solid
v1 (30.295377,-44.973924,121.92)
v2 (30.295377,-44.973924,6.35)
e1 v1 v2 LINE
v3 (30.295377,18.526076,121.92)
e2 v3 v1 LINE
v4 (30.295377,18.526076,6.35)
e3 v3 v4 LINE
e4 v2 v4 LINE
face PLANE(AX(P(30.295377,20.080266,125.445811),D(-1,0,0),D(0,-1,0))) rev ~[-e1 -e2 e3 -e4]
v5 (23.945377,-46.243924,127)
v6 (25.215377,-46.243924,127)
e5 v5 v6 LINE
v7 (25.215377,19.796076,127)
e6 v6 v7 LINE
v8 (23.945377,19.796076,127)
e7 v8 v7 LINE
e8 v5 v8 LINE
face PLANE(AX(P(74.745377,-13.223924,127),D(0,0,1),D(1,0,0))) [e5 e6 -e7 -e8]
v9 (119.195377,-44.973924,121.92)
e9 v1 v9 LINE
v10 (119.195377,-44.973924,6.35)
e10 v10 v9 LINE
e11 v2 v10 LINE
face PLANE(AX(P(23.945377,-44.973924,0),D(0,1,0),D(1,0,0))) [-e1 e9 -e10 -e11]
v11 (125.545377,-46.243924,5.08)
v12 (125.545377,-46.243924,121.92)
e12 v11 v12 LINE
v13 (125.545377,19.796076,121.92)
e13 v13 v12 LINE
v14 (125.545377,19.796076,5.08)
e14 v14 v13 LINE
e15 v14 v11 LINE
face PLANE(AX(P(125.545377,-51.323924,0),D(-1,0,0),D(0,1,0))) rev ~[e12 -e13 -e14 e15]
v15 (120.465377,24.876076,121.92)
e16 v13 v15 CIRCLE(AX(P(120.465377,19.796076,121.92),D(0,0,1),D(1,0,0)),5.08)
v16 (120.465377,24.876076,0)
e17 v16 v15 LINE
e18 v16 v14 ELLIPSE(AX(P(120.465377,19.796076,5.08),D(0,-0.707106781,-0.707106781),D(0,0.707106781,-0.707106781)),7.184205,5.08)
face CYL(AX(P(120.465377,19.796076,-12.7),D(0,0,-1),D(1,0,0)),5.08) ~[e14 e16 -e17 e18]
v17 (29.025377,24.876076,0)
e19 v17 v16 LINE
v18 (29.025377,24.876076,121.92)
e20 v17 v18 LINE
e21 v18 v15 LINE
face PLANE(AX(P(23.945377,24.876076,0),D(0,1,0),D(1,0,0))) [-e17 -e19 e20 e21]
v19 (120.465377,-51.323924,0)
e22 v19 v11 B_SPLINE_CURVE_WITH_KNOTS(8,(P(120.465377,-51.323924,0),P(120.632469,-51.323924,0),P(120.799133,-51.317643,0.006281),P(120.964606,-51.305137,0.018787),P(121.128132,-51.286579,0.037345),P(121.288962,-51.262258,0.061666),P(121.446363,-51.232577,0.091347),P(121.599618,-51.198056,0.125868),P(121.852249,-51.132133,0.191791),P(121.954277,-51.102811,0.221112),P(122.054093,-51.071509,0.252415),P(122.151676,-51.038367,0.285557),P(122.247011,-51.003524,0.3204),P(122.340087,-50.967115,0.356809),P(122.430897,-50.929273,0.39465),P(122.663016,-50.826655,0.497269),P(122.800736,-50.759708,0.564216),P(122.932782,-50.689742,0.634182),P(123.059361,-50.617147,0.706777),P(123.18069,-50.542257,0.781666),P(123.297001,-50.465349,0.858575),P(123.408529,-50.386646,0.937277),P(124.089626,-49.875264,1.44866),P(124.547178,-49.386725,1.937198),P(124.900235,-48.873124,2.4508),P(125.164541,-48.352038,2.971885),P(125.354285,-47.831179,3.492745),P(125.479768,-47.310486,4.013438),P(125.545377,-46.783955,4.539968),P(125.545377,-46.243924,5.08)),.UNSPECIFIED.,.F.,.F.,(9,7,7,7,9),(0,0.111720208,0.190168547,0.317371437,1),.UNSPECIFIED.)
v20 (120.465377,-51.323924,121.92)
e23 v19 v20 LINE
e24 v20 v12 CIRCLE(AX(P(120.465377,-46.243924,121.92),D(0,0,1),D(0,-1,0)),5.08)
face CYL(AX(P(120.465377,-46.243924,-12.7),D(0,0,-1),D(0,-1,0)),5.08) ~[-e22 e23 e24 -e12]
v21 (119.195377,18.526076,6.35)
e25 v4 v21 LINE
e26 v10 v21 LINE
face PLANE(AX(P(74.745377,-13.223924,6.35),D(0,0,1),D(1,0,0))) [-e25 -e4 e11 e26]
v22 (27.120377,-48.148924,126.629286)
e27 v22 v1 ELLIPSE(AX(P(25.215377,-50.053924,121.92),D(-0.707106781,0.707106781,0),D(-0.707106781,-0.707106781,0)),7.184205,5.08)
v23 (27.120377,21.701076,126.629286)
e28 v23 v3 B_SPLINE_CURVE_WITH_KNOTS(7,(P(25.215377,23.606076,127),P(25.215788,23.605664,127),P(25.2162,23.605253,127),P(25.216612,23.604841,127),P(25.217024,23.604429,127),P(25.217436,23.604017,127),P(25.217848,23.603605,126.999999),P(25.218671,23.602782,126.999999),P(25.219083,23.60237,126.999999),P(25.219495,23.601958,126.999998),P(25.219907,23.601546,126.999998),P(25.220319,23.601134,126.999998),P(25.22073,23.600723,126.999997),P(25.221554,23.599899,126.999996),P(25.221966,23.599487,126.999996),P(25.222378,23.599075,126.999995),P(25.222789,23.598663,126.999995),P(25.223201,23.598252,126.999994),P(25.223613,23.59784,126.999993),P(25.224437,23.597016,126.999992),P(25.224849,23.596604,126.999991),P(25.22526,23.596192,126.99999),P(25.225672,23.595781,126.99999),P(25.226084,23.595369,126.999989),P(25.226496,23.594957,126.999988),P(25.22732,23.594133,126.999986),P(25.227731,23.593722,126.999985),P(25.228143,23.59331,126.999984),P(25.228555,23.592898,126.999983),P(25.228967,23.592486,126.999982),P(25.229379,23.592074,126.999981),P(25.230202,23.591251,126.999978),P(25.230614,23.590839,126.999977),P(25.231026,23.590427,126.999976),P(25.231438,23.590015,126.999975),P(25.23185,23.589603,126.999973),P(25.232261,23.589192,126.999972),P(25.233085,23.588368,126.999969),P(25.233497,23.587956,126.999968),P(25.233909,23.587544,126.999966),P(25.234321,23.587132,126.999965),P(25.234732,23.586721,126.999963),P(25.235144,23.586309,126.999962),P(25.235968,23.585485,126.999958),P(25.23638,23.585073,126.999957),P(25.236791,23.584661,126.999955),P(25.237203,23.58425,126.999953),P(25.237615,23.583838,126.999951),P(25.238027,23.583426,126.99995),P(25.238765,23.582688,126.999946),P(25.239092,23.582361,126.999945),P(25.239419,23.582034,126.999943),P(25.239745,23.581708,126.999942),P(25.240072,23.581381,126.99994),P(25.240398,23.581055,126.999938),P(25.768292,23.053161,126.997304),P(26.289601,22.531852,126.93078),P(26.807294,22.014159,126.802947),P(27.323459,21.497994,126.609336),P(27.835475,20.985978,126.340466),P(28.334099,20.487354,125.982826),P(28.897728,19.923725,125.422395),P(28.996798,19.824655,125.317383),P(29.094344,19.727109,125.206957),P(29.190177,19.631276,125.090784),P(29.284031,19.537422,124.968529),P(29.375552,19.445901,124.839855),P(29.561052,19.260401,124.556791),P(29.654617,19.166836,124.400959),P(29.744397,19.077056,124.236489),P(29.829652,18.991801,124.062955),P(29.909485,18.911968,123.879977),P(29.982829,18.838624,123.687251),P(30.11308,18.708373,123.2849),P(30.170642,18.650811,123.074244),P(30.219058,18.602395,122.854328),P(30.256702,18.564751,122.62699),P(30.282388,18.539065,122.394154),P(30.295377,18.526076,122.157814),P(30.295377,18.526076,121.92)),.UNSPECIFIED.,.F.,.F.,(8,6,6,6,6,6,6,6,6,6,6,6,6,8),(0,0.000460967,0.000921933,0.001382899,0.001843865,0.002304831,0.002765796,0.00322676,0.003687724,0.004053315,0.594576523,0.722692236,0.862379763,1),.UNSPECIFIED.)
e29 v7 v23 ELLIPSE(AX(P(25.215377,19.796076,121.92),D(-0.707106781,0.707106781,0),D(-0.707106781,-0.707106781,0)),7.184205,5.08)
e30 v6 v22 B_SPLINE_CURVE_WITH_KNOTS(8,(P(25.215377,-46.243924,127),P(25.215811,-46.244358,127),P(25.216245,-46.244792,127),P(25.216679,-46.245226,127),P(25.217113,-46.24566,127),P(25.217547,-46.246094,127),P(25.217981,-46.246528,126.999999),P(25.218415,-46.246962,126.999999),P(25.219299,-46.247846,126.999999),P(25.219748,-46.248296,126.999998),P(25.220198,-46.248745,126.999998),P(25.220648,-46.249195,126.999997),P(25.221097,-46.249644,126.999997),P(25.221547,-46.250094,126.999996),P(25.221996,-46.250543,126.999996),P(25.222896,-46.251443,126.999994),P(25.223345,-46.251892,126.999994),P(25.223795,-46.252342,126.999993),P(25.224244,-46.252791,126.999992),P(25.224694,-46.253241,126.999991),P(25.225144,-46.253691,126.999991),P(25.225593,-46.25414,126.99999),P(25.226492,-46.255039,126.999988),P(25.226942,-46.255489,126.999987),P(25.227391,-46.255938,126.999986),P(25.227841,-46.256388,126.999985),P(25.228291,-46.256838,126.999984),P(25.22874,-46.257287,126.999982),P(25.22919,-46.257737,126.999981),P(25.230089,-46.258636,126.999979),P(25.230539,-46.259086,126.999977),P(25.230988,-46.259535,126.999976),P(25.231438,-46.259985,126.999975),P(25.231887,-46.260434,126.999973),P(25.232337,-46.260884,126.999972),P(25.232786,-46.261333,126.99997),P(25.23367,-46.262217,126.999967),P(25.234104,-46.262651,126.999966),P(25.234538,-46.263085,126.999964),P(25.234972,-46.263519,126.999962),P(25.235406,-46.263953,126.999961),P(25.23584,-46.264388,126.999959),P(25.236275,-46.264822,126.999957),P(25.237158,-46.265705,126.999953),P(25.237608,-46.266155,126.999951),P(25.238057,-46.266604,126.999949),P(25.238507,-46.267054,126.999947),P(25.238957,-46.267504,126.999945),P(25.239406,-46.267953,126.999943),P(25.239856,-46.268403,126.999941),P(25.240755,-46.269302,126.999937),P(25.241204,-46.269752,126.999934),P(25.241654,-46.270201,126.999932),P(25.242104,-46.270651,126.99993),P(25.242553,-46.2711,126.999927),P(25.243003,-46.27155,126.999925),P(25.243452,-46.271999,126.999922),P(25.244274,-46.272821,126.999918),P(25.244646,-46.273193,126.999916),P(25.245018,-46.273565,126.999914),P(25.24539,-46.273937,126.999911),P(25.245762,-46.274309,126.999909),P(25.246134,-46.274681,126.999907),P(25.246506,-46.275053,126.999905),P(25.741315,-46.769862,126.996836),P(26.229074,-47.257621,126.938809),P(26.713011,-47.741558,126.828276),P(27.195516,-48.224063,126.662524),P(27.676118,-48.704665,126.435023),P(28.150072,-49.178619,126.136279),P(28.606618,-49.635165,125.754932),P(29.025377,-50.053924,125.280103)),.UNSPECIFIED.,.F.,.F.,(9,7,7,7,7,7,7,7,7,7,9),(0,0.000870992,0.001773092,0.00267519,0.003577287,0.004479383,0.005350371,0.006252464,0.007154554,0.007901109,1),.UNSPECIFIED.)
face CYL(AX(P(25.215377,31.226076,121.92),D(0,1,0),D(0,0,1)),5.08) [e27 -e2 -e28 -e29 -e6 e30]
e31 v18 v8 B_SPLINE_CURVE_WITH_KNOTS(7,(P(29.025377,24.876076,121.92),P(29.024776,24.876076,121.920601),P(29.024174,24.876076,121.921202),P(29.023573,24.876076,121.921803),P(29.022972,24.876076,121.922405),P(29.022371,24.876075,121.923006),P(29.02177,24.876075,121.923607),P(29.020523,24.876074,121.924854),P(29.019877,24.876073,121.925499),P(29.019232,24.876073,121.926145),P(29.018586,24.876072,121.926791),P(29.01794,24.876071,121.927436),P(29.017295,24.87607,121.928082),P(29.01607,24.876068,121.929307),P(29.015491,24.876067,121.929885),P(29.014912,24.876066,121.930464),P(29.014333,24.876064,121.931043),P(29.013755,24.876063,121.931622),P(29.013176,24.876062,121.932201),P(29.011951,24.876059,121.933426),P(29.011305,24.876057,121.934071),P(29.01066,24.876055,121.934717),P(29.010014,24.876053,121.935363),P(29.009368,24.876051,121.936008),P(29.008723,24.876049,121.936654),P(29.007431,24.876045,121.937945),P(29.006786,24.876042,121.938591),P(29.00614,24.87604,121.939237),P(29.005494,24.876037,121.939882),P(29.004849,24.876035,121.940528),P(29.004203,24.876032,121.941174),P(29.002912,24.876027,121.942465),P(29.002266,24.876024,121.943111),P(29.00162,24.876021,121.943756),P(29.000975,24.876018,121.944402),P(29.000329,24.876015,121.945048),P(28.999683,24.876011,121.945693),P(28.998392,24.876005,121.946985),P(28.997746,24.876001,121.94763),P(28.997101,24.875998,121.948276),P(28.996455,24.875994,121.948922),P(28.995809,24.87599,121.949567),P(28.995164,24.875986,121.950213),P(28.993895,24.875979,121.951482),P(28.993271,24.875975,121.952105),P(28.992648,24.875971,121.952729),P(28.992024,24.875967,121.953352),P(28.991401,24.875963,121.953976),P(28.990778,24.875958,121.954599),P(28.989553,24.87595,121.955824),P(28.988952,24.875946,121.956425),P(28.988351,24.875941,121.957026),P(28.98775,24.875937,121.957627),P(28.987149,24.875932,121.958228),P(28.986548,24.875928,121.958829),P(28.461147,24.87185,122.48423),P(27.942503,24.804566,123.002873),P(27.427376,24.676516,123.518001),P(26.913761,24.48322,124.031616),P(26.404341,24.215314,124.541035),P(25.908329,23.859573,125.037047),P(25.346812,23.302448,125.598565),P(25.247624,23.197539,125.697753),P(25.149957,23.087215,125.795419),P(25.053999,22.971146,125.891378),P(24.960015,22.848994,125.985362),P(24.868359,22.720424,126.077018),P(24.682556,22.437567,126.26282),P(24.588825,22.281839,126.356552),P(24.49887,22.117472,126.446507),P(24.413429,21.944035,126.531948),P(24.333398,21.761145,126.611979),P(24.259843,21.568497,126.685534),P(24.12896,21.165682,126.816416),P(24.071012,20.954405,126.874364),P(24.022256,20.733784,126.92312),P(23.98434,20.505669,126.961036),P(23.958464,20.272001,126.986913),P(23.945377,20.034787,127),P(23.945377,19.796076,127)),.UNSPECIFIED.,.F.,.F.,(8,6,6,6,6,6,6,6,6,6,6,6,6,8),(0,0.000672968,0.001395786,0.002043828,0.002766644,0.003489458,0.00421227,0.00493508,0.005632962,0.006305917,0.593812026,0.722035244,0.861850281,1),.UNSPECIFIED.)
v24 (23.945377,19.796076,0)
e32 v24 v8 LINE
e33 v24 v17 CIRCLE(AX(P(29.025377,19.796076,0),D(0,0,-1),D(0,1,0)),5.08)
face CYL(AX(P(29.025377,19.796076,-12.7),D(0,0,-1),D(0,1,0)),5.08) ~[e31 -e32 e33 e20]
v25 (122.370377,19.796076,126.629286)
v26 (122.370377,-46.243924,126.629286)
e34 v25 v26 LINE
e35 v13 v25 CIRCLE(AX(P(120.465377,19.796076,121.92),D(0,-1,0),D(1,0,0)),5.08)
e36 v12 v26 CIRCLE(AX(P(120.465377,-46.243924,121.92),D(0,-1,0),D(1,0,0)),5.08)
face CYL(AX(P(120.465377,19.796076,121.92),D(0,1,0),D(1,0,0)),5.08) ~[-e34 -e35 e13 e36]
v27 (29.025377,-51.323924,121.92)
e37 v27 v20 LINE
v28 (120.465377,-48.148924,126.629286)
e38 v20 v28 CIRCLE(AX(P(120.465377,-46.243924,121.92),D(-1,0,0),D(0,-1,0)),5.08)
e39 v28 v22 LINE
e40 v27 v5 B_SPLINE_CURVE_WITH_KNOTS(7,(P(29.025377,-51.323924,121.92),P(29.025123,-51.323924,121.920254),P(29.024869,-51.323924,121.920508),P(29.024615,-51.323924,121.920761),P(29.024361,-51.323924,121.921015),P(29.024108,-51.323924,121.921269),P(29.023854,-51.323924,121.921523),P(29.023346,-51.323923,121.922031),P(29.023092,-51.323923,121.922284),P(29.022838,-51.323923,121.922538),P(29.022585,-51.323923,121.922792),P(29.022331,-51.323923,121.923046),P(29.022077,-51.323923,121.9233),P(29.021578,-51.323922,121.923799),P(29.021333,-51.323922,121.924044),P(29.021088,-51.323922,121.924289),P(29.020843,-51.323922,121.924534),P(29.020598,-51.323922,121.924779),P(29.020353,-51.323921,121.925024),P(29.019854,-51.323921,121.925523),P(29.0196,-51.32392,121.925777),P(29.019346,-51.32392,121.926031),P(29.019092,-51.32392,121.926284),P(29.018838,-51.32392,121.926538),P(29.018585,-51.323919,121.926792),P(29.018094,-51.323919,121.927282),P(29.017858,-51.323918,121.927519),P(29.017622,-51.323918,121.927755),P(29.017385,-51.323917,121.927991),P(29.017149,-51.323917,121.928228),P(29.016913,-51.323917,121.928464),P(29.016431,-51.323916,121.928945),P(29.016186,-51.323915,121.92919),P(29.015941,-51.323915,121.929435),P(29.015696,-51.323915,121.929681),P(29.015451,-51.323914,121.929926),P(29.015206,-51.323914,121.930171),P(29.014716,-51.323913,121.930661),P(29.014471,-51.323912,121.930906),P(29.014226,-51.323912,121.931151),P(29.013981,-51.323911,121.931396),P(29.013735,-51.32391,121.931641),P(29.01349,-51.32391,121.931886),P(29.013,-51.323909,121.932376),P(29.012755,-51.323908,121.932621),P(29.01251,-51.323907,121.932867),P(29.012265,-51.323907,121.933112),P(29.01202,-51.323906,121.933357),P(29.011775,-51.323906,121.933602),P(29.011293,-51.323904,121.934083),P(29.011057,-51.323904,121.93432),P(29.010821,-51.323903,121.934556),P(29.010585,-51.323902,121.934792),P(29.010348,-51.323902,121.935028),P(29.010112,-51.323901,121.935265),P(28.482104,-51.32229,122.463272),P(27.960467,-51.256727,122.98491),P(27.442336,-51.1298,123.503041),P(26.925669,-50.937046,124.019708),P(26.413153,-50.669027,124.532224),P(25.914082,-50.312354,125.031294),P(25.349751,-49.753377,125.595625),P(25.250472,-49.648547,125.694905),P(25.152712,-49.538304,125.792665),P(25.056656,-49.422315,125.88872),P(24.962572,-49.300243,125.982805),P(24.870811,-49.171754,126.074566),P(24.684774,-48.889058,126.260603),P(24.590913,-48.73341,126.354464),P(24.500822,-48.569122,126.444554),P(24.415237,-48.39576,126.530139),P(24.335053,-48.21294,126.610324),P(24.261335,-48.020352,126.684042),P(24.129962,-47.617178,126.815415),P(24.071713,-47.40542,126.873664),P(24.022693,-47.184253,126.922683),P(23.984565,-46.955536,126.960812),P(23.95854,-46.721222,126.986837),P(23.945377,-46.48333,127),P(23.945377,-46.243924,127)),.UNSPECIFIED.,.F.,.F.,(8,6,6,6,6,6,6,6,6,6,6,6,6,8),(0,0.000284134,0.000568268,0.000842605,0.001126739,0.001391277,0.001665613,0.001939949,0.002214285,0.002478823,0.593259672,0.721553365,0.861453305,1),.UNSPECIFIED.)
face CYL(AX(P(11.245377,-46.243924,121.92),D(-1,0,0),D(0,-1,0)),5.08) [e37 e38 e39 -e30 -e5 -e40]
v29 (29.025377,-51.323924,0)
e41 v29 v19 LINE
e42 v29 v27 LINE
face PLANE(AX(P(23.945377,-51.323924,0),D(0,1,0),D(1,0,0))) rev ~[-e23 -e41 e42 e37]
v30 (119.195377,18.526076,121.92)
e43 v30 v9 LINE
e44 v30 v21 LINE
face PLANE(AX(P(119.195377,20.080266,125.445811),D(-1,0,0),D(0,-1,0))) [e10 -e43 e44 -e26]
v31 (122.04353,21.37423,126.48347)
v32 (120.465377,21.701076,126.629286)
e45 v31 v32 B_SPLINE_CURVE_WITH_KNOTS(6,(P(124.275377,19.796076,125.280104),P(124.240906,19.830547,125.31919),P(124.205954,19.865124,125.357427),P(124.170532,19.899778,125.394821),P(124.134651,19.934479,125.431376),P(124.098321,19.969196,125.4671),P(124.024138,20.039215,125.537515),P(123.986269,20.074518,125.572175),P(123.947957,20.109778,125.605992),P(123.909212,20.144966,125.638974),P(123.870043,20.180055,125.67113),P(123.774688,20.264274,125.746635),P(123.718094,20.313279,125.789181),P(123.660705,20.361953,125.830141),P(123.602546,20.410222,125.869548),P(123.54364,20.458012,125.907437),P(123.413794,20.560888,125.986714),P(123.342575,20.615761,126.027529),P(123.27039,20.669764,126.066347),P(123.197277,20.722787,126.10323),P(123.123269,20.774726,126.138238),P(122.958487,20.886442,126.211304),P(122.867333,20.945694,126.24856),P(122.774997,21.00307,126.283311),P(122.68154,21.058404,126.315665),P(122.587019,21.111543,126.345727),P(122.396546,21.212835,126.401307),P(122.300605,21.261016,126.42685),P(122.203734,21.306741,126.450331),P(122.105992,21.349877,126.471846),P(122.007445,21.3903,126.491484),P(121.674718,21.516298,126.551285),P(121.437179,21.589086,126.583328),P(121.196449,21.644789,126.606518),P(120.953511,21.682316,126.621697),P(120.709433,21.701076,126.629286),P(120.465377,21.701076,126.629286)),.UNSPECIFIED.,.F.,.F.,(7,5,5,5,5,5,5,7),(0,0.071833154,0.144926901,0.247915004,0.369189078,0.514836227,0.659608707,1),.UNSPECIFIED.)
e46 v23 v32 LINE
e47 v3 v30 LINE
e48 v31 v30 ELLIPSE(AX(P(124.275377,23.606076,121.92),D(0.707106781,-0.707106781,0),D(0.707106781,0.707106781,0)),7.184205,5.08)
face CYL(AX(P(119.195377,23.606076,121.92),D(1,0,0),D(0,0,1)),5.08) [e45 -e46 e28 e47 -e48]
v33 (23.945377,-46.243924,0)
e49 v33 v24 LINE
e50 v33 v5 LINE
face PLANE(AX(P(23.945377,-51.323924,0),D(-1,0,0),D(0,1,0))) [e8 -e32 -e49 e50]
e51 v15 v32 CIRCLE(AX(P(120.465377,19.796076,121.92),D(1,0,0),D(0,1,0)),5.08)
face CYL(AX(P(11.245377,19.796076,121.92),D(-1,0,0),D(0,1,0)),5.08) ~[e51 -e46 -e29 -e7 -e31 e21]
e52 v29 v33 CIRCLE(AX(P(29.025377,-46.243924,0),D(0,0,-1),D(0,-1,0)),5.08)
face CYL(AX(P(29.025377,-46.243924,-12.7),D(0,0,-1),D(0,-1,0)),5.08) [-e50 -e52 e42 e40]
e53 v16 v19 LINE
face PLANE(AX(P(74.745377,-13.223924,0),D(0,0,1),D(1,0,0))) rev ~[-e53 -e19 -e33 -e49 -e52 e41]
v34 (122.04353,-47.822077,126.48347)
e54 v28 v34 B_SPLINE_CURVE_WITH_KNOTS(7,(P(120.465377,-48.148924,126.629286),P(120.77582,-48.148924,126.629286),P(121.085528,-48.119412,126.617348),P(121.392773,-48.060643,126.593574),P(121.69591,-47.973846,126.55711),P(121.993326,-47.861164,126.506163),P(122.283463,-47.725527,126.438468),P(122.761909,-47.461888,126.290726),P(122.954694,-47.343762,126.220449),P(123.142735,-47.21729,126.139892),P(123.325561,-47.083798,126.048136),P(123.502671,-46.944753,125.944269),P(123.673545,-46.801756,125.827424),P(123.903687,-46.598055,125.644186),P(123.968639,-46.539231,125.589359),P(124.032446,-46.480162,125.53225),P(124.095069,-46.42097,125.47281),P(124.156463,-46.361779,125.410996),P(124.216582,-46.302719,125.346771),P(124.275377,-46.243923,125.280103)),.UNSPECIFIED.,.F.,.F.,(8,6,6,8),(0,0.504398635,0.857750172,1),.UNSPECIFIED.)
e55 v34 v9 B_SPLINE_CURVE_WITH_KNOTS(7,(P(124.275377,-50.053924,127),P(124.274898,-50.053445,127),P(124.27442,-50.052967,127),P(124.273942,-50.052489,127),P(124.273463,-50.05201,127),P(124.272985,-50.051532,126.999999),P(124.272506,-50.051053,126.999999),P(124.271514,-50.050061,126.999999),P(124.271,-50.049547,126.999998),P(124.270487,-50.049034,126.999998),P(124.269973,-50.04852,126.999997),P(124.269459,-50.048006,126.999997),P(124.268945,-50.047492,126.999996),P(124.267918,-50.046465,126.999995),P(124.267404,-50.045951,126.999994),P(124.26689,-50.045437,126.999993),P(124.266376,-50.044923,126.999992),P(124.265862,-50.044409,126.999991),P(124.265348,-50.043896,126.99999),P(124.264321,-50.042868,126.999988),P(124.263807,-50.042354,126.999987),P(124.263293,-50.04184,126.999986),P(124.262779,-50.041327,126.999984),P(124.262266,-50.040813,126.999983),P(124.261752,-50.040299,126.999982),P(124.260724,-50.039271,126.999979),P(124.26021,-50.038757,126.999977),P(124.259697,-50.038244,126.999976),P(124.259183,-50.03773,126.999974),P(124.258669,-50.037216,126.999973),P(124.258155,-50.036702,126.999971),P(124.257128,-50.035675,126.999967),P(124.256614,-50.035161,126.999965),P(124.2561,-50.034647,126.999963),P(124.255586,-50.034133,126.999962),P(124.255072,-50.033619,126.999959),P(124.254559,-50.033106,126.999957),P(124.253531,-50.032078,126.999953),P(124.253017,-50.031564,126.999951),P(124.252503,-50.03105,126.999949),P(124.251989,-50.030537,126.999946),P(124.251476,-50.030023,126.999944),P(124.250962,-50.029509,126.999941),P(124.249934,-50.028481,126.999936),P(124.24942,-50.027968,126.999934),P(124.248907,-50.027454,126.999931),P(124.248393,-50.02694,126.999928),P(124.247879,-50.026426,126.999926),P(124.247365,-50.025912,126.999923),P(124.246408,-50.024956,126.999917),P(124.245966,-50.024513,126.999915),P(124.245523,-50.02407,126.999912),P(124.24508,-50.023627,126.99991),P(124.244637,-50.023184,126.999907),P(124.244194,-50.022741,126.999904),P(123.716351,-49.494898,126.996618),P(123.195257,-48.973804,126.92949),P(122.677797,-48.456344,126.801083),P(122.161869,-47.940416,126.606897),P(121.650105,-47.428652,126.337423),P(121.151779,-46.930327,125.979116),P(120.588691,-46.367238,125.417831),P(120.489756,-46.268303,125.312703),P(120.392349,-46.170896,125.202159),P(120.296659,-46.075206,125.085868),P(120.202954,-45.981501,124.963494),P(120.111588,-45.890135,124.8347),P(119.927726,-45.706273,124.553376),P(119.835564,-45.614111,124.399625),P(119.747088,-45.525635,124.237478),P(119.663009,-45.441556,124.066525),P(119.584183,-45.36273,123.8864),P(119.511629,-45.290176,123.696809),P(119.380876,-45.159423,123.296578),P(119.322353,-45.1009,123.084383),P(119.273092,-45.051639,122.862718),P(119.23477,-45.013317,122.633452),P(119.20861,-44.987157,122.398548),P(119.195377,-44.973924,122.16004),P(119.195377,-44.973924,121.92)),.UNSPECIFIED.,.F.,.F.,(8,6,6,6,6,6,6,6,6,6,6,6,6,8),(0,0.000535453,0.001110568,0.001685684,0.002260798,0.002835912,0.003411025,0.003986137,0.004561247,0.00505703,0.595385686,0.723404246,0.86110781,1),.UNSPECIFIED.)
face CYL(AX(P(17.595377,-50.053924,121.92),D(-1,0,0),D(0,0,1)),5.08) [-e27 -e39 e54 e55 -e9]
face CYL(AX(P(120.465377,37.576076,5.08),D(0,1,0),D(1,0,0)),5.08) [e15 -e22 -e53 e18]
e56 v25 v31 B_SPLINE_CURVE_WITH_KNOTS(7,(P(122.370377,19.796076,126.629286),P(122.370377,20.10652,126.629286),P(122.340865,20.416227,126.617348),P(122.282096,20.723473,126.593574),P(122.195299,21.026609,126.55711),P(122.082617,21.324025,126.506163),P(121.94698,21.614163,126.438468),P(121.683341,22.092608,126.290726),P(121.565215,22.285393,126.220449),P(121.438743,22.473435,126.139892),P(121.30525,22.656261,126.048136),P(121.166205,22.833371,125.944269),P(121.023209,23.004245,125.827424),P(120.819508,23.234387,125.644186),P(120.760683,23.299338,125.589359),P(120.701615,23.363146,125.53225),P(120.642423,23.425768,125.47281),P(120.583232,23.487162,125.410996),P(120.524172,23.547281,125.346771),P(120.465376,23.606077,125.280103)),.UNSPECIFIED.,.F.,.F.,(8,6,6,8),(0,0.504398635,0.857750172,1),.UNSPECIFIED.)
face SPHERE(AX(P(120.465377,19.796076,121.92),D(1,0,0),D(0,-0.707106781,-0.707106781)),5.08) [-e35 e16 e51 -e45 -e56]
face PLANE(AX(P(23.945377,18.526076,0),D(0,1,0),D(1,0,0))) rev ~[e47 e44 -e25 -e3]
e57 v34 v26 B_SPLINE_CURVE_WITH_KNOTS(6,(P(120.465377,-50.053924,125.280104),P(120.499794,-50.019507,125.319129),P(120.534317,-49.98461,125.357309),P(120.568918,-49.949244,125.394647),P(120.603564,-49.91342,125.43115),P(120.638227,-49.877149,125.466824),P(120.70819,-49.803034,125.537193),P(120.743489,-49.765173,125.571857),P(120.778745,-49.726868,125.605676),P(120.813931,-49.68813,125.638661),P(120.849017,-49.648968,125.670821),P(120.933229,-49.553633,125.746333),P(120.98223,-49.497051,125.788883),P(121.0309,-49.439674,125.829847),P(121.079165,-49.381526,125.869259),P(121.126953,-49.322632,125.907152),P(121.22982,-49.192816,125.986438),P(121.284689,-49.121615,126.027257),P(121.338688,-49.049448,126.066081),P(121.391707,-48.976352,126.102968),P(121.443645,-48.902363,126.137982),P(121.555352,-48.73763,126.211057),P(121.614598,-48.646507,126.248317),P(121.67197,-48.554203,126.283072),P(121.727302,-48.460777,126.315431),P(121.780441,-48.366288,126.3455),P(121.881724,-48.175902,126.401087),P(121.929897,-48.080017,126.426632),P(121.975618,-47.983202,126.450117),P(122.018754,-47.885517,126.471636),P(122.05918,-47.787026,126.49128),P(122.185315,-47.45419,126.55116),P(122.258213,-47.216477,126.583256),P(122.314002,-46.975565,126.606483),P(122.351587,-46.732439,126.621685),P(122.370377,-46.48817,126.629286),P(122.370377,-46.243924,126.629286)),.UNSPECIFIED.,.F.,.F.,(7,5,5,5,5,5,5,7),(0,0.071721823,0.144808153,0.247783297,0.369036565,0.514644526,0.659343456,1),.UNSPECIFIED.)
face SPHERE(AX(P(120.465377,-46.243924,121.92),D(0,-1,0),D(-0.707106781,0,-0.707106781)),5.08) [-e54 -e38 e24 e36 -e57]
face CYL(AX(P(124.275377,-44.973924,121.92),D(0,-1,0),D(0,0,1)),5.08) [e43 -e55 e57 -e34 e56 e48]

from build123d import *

# Parameters (mm, degrees)
F0_W         = 101.6
F0_H         = 76.2
F1_DEPTH     = 127
F2_T         = -6.35
F3_T1_DEPTH  = 152.4
F3_T3_DEPTH  = 134.62
F3_T5_DEPTH  = 101.6
F3_T7_DEPTH  = 66.04
F3_T9_DEPTH  = 109.22
F3_T11_DEPTH = 88.9
F3_T13_DEPTH = 63.5
F3_S17_W     = 5.1816
F3_S17_H     = 5.1816
F3_T18_DEPTH = 5.1816
F3_S23_W     = 5.1816
F3_S23_H     = 5.1816
F3_T24_DEPTH = 5.1816
F3_T31_DEPTH = 101.6
F3_T36_DEPTH = 76.2
F3_T44_DEPTH = 76.2
F3_T49_DEPTH = 101.6
F3_T57_DEPTH = 101.6
F3_T62_DEPTH = 76.2
F3_T70_DEPTH = 101.6
F3_T75_DEPTH = 76.2


# Not quite as in the source:
# - a fillet or chamfer that OpenCascade refuses, or shapes differently, is made with other operations: its cross-section is extruded or revolved along the edge and cut away or added


with BuildPart() as f1:
    # F0 (on Top) → F1 (new body)
    with BuildSketch(Plane.XY):
        with Locations((74.7453766656, -13.2239237391)):
            Rectangle(F0_W, F0_H)
    extrude(amount=F1_DEPTH)

    # F2
    f2_openings = [f1.faces().sort_by_distance(p)[0] for p in [
        (74.745377, -13.223924, 127),
    ]]
    offset(amount=F2_T, openings=f2_openings)

    # F3: fillet of radius 5.08 on 12 edges, made by hand

    # F3_s2 → F3_t1 (cut)
    with BuildSketch(Plane.XY.offset(-12.7)):
        with BuildLine():
            ThreePointArc((29.0253766656, 24.8760762609), (25.4332742171, 23.3881787093), (23.9453766656, 19.7960762609))
            Line((23.9453766656, 19.7960762609), (23.9453766656, 24.8760762609))
            Line((23.9453766656, 24.8760762609), (29.0253766656, 24.8760762609))
        make_face()
        with BuildLine():
            ThreePointArc((29.0253766656, -51.3239237391), (25.4332742171, -49.8360261876), (23.9453766656, -46.2439237391))
            Line((23.9453766656, -46.2439237391), (23.9453766656, -51.3239237391))
            Line((23.9453766656, -51.3239237391), (29.0253766656, -51.3239237391))
        make_face()
    extrude(amount=F3_T1_DEPTH, mode=Mode.SUBTRACT)

    # F3_s4 → F3_t3 (cut)
    with BuildSketch(Plane.XY.offset(-12.7)):
        with BuildLine():
            ThreePointArc((125.5453766656, 19.7960762609), (124.057479114, 23.3881787093), (120.4653766656, 24.8760762609))
            Line((120.4653766656, 24.8760762609), (125.5453766656, 24.8760762609))
            Line((125.5453766656, 24.8760762609), (125.5453766656, 19.7960762609))
        make_face()
        with BuildLine():
            ThreePointArc((120.4653766656, -51.3239237391), (124.057479114, -49.8360261876), (125.5453766656, -46.2439237391))
            Line((125.5453766656, -46.2439237391), (125.5453766656, -51.3239237391))
            Line((125.5453766656, -51.3239237391), (120.4653766656, -51.3239237391))
        make_face()
    extrude(amount=F3_T3_DEPTH, mode=Mode.SUBTRACT)

    # F3_s6 → F3_t5 (cut)
    with BuildSketch(Plane.XZ.offset(-37.5760762609)):
        with BuildLine():
            ThreePointArc((125.5453766656, 5.08), (124.057479114, 1.4878975516), (120.4653766656, 0))
            Line((120.4653766656, 0), (125.5453766656, 0))
            Line((125.5453766656, 0), (125.5453766656, 5.08))
        make_face()
    extrude(amount=F3_T5_DEPTH, mode=Mode.SUBTRACT)

    # F3_s8 → F3_t7 (cut)
    with BuildSketch(Plane.XZ.offset(-19.7960762609)):
        with BuildLine():
            ThreePointArc((125.5453766656, 121.92), (124.057479114, 125.5121024484), (120.4653766656, 127))
            Line((120.4653766656, 127), (125.5453766656, 127))
            Line((125.5453766656, 127), (125.5453766656, 121.92))
        make_face()
    extrude(amount=F3_T7_DEPTH, mode=Mode.SUBTRACT)

    # F3_s10 → F3_t9 (cut)
    with BuildSketch(Plane.YZ.offset(11.2453766656)):
        with BuildLine():
            ThreePointArc((-51.3239237391, 121.92), (-49.8360261876, 125.5121024484), (-46.2439237391, 127))
            Line((-46.2439237391, 127), (-51.3239237391, 127))
            Line((-51.3239237391, 127), (-51.3239237391, 121.92))
        make_face()
        with BuildLine():
            ThreePointArc((24.8760762609, 121.92), (23.3881787093, 125.5121024484), (19.7960762609, 127))
            Line((19.7960762609, 127), (24.8760762609, 127))
            Line((24.8760762609, 127), (24.8760762609, 121.92))
        make_face()
    extrude(amount=F3_T9_DEPTH, mode=Mode.SUBTRACT)

    # F3_s12 → F3_t11 (cut)
    with BuildSketch(Plane.YZ.offset(30.2953766656)):
        with BuildLine():
            ThreePointArc((23.6060762609, 127), (20.0139738124, 125.5121024484), (18.5260762609, 121.92))
            Line((18.5260762609, 121.92), (18.5260762609, 127))
            Line((18.5260762609, 127), (23.6060762609, 127))
        make_face()
        with BuildLine():
            ThreePointArc((-50.0539237391, 127), (-46.4618212907, 125.5121024484), (-44.9739237391, 121.92))
            Line((-44.9739237391, 121.92), (-44.9739237391, 127))
            Line((-44.9739237391, 127), (-50.0539237391, 127))
        make_face()
    extrude(amount=F3_T11_DEPTH, mode=Mode.SUBTRACT)

    # F3_s14 → F3_t13 (cut)
    with BuildSketch(Plane.XZ.offset(-18.5260762609)):
        with BuildLine():
            ThreePointArc((25.2153766656, 127), (28.807479114, 125.5121024484), (30.2953766656, 121.92))
            Line((30.2953766656, 121.92), (30.2953766656, 127))
            Line((30.2953766656, 127), (25.2153766656, 127))
        make_face()
        with BuildLine():
            ThreePointArc((124.2753766656, 127), (120.6832742171, 125.5121024484), (119.1953766656, 121.92))
            Line((119.1953766656, 121.92), (119.1953766656, 127))
            Line((119.1953766656, 127), (124.2753766656, 127))
        make_face()
    extrude(amount=F3_T13_DEPTH, mode=Mode.SUBTRACT)


with BuildPart() as f3_tool16:
    # F3_s17 → F3_t18 (new body)
    with BuildSketch(Plane.YZ.offset(120.4653766656)):
        with Locations((22.3868762609, 124.5108)):
            Rectangle(F3_S17_W, F3_S17_H)
    extrude(amount=F3_T18_DEPTH)

    # F3_s19 → F3_t20 (revolve, cut)
    with BuildSketch(Plane(origin=(120.4653766656, 19.7960762609, 121.92), x_dir=(0, -0.7071067812, -0.7071067812), z_dir=(0, -0.7071067812, 0.7071067812))):
        with BuildLine():
            ThreePointArc((0, -5.08), (5.08, 0), (0, 5.08))
            Line((0, 5.08), (0, -5.08))
        make_face()
    revolve(axis=Axis((120.4653766656, 19.7960762609, 121.92), (1, 0, 0)), mode=Mode.SUBTRACT)


with BuildPart() as f1_1:
    add(f1.part)

    # F3_t15: cut F3_tool16
    add(f3_tool16.part, mode=Mode.SUBTRACT)


with BuildPart() as f3_tool22:
    # F3_s23 → F3_t24 (new body)
    with BuildSketch(Plane.XZ.offset(46.2439237391)):
        with Locations((123.0561766656, 124.5108)):
            Rectangle(F3_S23_W, F3_S23_H)
    extrude(amount=F3_T24_DEPTH)

    # F3_s25 → F3_t26 (revolve, cut)
    with BuildSketch(Plane(origin=(120.4653766656, -46.2439237391, 121.92), x_dir=(-0.7071067812, 0, -0.7071067812), z_dir=(-0.7071067812, 0, 0.7071067812))):
        with BuildLine():
            ThreePointArc((0, -5.08), (5.08, 0), (0, 5.08))
            Line((0, 5.08), (0, -5.08))
        make_face()
    revolve(axis=Axis((120.4653766656, -46.2439237391, 121.92), (0, -1, 0)), mode=Mode.SUBTRACT)


with BuildPart() as f1_2:
    add(f1_1.part)

    # F3_t21: cut F3_tool22
    add(f3_tool22.part, mode=Mode.SUBTRACT)


with BuildPart() as f3_tool29:
    # F3_s30 → F3_t31 (new body)
    with BuildSketch(Plane.YZ.offset(131.8953766656)):
        with BuildLine():
            ThreePointArc((23.6060762609, 127), (20.0139738124, 125.5121024484), (18.5260762609, 121.92))
            Line((18.5260762609, 121.92), (18.5260762609, 127))
            Line((18.5260762609, 127), (23.6060762609, 127))
        make_face()
    extrude(amount=-F3_T31_DEPTH)

    split(bisect_by=Plane.YZ.offset(125.5453766656), keep=Keep.BOTTOM)

    split(bisect_by=Plane.YZ.offset(119.1953766656), keep=Keep.TOP)


with BuildPart() as f3_tool34:
    # F3_s35 → F3_t36 (new body)
    with BuildSketch(Plane.XZ.offset(44.9739237391)):
        with BuildLine():
            ThreePointArc((124.2753766656, 127), (120.6832742171, 125.5121024484), (119.1953766656, 121.92))
            Line((119.1953766656, 121.92), (119.1953766656, 127))
            Line((119.1953766656, 127), (124.2753766656, 127))
        make_face()
    extrude(amount=-F3_T36_DEPTH)

    split(bisect_by=Plane.XZ.offset(-24.8760762609), keep=Keep.TOP)

    split(bisect_by=Plane.XZ.offset(-18.5260762609), keep=Keep.BOTTOM)


with BuildPart() as f3_tool29_1:
    add(f3_tool29.part)

    # F3_t39: intersect F3_tool34
    add(f3_tool34.part, mode=Mode.INTERSECT)


with BuildPart() as f1_3:
    add(f1_2.part)

    # F3_t27: cut F3_tool29
    add(f3_tool29_1.part, mode=Mode.SUBTRACT)


with BuildPart() as f3_tool42:
    # F3_s43 → F3_t44 (new body)
    with BuildSketch(Plane.XZ.offset(-31.2260762609)):
        with BuildLine():
            ThreePointArc((25.2153766656, 127), (28.807479114, 125.5121024484), (30.2953766656, 121.92))
            Line((30.2953766656, 121.92), (30.2953766656, 127))
            Line((30.2953766656, 127), (25.2153766656, 127))
        make_face()
    extrude(amount=F3_T44_DEPTH)

    split(bisect_by=Plane.XZ.offset(-24.8760762609), keep=Keep.TOP)

    split(bisect_by=Plane.XZ.offset(-18.5260762609), keep=Keep.BOTTOM)


with BuildPart() as f3_tool47:
    # F3_s48 → F3_t49 (new body)
    with BuildSketch(Plane.YZ.offset(119.1953766656)):
        with BuildLine():
            ThreePointArc((23.6060762609, 127), (20.0139738124, 125.5121024484), (18.5260762609, 121.92))
            Line((18.5260762609, 121.92), (18.5260762609, 127))
            Line((18.5260762609, 127), (23.6060762609, 127))
        make_face()
    extrude(amount=-F3_T49_DEPTH)

    split(bisect_by=Plane.YZ.offset(23.9453766656), keep=Keep.TOP)

    split(bisect_by=Plane.YZ.offset(30.2953766656), keep=Keep.BOTTOM)


with BuildPart() as f3_tool42_1:
    add(f3_tool42.part)

    # F3_t52: intersect F3_tool47
    add(f3_tool47.part, mode=Mode.INTERSECT)


with BuildPart() as f1_4:
    add(f1_3.part)

    # F3_t40: cut F3_tool42
    add(f3_tool42_1.part, mode=Mode.SUBTRACT)


with BuildPart() as f3_tool55:
    # F3_s56 → F3_t57 (new body)
    with BuildSketch(Plane.YZ.offset(17.5953766656)):
        with BuildLine():
            ThreePointArc((-50.0539237391, 127), (-46.4618212907, 125.5121024484), (-44.9739237391, 121.92))
            Line((-44.9739237391, 121.92), (-44.9739237391, 127))
            Line((-44.9739237391, 127), (-50.0539237391, 127))
        make_face()
    extrude(amount=F3_T57_DEPTH)

    split(bisect_by=Plane.YZ.offset(23.9453766656), keep=Keep.TOP)

    split(bisect_by=Plane.YZ.offset(30.2953766656), keep=Keep.BOTTOM)


with BuildPart() as f3_tool60:
    # F3_s61 → F3_t62 (new body)
    with BuildSketch(Plane.XZ.offset(-18.5260762609)):
        with BuildLine():
            ThreePointArc((25.2153766656, 127), (28.807479114, 125.5121024484), (30.2953766656, 121.92))
            Line((30.2953766656, 121.92), (30.2953766656, 127))
            Line((30.2953766656, 127), (25.2153766656, 127))
        make_face()
    extrude(amount=F3_T62_DEPTH)

    split(bisect_by=Plane.XZ.offset(51.3239237391), keep=Keep.BOTTOM)

    split(bisect_by=Plane.XZ.offset(44.9739237391), keep=Keep.TOP)


with BuildPart() as f3_tool55_1:
    add(f3_tool55.part)

    # F3_t65: intersect F3_tool60
    add(f3_tool60.part, mode=Mode.INTERSECT)


with BuildPart() as f1_5:
    add(f1_4.part)

    # F3_t53: cut F3_tool55
    add(f3_tool55_1.part, mode=Mode.SUBTRACT)


with BuildPart() as f3_tool68:
    # F3_s69 → F3_t70 (new body)
    with BuildSketch(Plane.YZ.offset(30.2953766656)):
        with BuildLine():
            ThreePointArc((-50.0539237391, 127), (-46.4618212907, 125.5121024484), (-44.9739237391, 121.92))
            Line((-44.9739237391, 121.92), (-44.9739237391, 127))
            Line((-44.9739237391, 127), (-50.0539237391, 127))
        make_face()
    extrude(amount=F3_T70_DEPTH)

    split(bisect_by=Plane.YZ.offset(125.5453766656), keep=Keep.BOTTOM)

    split(bisect_by=Plane.YZ.offset(119.1953766656), keep=Keep.TOP)


with BuildPart() as f3_tool73:
    # F3_s74 → F3_t75 (new body)
    with BuildSketch(Plane.XZ.offset(57.6739237391)):
        with BuildLine():
            ThreePointArc((124.2753766656, 127), (120.6832742171, 125.5121024484), (119.1953766656, 121.92))
            Line((119.1953766656, 121.92), (119.1953766656, 127))
            Line((119.1953766656, 127), (124.2753766656, 127))
        make_face()
    extrude(amount=-F3_T75_DEPTH)

    split(bisect_by=Plane.XZ.offset(51.3239237391), keep=Keep.BOTTOM)

    split(bisect_by=Plane.XZ.offset(44.9739237391), keep=Keep.TOP)


with BuildPart() as f3_tool68_1:
    add(f3_tool68.part)

    # F3_t78: intersect F3_tool73
    add(f3_tool73.part, mode=Mode.INTERSECT)


with BuildPart() as f1_6:
    add(f1_5.part)

    # F3_t66: cut F3_tool68
    add(f3_tool68_1.part, mode=Mode.SUBTRACT)


solid = f1_6.part
